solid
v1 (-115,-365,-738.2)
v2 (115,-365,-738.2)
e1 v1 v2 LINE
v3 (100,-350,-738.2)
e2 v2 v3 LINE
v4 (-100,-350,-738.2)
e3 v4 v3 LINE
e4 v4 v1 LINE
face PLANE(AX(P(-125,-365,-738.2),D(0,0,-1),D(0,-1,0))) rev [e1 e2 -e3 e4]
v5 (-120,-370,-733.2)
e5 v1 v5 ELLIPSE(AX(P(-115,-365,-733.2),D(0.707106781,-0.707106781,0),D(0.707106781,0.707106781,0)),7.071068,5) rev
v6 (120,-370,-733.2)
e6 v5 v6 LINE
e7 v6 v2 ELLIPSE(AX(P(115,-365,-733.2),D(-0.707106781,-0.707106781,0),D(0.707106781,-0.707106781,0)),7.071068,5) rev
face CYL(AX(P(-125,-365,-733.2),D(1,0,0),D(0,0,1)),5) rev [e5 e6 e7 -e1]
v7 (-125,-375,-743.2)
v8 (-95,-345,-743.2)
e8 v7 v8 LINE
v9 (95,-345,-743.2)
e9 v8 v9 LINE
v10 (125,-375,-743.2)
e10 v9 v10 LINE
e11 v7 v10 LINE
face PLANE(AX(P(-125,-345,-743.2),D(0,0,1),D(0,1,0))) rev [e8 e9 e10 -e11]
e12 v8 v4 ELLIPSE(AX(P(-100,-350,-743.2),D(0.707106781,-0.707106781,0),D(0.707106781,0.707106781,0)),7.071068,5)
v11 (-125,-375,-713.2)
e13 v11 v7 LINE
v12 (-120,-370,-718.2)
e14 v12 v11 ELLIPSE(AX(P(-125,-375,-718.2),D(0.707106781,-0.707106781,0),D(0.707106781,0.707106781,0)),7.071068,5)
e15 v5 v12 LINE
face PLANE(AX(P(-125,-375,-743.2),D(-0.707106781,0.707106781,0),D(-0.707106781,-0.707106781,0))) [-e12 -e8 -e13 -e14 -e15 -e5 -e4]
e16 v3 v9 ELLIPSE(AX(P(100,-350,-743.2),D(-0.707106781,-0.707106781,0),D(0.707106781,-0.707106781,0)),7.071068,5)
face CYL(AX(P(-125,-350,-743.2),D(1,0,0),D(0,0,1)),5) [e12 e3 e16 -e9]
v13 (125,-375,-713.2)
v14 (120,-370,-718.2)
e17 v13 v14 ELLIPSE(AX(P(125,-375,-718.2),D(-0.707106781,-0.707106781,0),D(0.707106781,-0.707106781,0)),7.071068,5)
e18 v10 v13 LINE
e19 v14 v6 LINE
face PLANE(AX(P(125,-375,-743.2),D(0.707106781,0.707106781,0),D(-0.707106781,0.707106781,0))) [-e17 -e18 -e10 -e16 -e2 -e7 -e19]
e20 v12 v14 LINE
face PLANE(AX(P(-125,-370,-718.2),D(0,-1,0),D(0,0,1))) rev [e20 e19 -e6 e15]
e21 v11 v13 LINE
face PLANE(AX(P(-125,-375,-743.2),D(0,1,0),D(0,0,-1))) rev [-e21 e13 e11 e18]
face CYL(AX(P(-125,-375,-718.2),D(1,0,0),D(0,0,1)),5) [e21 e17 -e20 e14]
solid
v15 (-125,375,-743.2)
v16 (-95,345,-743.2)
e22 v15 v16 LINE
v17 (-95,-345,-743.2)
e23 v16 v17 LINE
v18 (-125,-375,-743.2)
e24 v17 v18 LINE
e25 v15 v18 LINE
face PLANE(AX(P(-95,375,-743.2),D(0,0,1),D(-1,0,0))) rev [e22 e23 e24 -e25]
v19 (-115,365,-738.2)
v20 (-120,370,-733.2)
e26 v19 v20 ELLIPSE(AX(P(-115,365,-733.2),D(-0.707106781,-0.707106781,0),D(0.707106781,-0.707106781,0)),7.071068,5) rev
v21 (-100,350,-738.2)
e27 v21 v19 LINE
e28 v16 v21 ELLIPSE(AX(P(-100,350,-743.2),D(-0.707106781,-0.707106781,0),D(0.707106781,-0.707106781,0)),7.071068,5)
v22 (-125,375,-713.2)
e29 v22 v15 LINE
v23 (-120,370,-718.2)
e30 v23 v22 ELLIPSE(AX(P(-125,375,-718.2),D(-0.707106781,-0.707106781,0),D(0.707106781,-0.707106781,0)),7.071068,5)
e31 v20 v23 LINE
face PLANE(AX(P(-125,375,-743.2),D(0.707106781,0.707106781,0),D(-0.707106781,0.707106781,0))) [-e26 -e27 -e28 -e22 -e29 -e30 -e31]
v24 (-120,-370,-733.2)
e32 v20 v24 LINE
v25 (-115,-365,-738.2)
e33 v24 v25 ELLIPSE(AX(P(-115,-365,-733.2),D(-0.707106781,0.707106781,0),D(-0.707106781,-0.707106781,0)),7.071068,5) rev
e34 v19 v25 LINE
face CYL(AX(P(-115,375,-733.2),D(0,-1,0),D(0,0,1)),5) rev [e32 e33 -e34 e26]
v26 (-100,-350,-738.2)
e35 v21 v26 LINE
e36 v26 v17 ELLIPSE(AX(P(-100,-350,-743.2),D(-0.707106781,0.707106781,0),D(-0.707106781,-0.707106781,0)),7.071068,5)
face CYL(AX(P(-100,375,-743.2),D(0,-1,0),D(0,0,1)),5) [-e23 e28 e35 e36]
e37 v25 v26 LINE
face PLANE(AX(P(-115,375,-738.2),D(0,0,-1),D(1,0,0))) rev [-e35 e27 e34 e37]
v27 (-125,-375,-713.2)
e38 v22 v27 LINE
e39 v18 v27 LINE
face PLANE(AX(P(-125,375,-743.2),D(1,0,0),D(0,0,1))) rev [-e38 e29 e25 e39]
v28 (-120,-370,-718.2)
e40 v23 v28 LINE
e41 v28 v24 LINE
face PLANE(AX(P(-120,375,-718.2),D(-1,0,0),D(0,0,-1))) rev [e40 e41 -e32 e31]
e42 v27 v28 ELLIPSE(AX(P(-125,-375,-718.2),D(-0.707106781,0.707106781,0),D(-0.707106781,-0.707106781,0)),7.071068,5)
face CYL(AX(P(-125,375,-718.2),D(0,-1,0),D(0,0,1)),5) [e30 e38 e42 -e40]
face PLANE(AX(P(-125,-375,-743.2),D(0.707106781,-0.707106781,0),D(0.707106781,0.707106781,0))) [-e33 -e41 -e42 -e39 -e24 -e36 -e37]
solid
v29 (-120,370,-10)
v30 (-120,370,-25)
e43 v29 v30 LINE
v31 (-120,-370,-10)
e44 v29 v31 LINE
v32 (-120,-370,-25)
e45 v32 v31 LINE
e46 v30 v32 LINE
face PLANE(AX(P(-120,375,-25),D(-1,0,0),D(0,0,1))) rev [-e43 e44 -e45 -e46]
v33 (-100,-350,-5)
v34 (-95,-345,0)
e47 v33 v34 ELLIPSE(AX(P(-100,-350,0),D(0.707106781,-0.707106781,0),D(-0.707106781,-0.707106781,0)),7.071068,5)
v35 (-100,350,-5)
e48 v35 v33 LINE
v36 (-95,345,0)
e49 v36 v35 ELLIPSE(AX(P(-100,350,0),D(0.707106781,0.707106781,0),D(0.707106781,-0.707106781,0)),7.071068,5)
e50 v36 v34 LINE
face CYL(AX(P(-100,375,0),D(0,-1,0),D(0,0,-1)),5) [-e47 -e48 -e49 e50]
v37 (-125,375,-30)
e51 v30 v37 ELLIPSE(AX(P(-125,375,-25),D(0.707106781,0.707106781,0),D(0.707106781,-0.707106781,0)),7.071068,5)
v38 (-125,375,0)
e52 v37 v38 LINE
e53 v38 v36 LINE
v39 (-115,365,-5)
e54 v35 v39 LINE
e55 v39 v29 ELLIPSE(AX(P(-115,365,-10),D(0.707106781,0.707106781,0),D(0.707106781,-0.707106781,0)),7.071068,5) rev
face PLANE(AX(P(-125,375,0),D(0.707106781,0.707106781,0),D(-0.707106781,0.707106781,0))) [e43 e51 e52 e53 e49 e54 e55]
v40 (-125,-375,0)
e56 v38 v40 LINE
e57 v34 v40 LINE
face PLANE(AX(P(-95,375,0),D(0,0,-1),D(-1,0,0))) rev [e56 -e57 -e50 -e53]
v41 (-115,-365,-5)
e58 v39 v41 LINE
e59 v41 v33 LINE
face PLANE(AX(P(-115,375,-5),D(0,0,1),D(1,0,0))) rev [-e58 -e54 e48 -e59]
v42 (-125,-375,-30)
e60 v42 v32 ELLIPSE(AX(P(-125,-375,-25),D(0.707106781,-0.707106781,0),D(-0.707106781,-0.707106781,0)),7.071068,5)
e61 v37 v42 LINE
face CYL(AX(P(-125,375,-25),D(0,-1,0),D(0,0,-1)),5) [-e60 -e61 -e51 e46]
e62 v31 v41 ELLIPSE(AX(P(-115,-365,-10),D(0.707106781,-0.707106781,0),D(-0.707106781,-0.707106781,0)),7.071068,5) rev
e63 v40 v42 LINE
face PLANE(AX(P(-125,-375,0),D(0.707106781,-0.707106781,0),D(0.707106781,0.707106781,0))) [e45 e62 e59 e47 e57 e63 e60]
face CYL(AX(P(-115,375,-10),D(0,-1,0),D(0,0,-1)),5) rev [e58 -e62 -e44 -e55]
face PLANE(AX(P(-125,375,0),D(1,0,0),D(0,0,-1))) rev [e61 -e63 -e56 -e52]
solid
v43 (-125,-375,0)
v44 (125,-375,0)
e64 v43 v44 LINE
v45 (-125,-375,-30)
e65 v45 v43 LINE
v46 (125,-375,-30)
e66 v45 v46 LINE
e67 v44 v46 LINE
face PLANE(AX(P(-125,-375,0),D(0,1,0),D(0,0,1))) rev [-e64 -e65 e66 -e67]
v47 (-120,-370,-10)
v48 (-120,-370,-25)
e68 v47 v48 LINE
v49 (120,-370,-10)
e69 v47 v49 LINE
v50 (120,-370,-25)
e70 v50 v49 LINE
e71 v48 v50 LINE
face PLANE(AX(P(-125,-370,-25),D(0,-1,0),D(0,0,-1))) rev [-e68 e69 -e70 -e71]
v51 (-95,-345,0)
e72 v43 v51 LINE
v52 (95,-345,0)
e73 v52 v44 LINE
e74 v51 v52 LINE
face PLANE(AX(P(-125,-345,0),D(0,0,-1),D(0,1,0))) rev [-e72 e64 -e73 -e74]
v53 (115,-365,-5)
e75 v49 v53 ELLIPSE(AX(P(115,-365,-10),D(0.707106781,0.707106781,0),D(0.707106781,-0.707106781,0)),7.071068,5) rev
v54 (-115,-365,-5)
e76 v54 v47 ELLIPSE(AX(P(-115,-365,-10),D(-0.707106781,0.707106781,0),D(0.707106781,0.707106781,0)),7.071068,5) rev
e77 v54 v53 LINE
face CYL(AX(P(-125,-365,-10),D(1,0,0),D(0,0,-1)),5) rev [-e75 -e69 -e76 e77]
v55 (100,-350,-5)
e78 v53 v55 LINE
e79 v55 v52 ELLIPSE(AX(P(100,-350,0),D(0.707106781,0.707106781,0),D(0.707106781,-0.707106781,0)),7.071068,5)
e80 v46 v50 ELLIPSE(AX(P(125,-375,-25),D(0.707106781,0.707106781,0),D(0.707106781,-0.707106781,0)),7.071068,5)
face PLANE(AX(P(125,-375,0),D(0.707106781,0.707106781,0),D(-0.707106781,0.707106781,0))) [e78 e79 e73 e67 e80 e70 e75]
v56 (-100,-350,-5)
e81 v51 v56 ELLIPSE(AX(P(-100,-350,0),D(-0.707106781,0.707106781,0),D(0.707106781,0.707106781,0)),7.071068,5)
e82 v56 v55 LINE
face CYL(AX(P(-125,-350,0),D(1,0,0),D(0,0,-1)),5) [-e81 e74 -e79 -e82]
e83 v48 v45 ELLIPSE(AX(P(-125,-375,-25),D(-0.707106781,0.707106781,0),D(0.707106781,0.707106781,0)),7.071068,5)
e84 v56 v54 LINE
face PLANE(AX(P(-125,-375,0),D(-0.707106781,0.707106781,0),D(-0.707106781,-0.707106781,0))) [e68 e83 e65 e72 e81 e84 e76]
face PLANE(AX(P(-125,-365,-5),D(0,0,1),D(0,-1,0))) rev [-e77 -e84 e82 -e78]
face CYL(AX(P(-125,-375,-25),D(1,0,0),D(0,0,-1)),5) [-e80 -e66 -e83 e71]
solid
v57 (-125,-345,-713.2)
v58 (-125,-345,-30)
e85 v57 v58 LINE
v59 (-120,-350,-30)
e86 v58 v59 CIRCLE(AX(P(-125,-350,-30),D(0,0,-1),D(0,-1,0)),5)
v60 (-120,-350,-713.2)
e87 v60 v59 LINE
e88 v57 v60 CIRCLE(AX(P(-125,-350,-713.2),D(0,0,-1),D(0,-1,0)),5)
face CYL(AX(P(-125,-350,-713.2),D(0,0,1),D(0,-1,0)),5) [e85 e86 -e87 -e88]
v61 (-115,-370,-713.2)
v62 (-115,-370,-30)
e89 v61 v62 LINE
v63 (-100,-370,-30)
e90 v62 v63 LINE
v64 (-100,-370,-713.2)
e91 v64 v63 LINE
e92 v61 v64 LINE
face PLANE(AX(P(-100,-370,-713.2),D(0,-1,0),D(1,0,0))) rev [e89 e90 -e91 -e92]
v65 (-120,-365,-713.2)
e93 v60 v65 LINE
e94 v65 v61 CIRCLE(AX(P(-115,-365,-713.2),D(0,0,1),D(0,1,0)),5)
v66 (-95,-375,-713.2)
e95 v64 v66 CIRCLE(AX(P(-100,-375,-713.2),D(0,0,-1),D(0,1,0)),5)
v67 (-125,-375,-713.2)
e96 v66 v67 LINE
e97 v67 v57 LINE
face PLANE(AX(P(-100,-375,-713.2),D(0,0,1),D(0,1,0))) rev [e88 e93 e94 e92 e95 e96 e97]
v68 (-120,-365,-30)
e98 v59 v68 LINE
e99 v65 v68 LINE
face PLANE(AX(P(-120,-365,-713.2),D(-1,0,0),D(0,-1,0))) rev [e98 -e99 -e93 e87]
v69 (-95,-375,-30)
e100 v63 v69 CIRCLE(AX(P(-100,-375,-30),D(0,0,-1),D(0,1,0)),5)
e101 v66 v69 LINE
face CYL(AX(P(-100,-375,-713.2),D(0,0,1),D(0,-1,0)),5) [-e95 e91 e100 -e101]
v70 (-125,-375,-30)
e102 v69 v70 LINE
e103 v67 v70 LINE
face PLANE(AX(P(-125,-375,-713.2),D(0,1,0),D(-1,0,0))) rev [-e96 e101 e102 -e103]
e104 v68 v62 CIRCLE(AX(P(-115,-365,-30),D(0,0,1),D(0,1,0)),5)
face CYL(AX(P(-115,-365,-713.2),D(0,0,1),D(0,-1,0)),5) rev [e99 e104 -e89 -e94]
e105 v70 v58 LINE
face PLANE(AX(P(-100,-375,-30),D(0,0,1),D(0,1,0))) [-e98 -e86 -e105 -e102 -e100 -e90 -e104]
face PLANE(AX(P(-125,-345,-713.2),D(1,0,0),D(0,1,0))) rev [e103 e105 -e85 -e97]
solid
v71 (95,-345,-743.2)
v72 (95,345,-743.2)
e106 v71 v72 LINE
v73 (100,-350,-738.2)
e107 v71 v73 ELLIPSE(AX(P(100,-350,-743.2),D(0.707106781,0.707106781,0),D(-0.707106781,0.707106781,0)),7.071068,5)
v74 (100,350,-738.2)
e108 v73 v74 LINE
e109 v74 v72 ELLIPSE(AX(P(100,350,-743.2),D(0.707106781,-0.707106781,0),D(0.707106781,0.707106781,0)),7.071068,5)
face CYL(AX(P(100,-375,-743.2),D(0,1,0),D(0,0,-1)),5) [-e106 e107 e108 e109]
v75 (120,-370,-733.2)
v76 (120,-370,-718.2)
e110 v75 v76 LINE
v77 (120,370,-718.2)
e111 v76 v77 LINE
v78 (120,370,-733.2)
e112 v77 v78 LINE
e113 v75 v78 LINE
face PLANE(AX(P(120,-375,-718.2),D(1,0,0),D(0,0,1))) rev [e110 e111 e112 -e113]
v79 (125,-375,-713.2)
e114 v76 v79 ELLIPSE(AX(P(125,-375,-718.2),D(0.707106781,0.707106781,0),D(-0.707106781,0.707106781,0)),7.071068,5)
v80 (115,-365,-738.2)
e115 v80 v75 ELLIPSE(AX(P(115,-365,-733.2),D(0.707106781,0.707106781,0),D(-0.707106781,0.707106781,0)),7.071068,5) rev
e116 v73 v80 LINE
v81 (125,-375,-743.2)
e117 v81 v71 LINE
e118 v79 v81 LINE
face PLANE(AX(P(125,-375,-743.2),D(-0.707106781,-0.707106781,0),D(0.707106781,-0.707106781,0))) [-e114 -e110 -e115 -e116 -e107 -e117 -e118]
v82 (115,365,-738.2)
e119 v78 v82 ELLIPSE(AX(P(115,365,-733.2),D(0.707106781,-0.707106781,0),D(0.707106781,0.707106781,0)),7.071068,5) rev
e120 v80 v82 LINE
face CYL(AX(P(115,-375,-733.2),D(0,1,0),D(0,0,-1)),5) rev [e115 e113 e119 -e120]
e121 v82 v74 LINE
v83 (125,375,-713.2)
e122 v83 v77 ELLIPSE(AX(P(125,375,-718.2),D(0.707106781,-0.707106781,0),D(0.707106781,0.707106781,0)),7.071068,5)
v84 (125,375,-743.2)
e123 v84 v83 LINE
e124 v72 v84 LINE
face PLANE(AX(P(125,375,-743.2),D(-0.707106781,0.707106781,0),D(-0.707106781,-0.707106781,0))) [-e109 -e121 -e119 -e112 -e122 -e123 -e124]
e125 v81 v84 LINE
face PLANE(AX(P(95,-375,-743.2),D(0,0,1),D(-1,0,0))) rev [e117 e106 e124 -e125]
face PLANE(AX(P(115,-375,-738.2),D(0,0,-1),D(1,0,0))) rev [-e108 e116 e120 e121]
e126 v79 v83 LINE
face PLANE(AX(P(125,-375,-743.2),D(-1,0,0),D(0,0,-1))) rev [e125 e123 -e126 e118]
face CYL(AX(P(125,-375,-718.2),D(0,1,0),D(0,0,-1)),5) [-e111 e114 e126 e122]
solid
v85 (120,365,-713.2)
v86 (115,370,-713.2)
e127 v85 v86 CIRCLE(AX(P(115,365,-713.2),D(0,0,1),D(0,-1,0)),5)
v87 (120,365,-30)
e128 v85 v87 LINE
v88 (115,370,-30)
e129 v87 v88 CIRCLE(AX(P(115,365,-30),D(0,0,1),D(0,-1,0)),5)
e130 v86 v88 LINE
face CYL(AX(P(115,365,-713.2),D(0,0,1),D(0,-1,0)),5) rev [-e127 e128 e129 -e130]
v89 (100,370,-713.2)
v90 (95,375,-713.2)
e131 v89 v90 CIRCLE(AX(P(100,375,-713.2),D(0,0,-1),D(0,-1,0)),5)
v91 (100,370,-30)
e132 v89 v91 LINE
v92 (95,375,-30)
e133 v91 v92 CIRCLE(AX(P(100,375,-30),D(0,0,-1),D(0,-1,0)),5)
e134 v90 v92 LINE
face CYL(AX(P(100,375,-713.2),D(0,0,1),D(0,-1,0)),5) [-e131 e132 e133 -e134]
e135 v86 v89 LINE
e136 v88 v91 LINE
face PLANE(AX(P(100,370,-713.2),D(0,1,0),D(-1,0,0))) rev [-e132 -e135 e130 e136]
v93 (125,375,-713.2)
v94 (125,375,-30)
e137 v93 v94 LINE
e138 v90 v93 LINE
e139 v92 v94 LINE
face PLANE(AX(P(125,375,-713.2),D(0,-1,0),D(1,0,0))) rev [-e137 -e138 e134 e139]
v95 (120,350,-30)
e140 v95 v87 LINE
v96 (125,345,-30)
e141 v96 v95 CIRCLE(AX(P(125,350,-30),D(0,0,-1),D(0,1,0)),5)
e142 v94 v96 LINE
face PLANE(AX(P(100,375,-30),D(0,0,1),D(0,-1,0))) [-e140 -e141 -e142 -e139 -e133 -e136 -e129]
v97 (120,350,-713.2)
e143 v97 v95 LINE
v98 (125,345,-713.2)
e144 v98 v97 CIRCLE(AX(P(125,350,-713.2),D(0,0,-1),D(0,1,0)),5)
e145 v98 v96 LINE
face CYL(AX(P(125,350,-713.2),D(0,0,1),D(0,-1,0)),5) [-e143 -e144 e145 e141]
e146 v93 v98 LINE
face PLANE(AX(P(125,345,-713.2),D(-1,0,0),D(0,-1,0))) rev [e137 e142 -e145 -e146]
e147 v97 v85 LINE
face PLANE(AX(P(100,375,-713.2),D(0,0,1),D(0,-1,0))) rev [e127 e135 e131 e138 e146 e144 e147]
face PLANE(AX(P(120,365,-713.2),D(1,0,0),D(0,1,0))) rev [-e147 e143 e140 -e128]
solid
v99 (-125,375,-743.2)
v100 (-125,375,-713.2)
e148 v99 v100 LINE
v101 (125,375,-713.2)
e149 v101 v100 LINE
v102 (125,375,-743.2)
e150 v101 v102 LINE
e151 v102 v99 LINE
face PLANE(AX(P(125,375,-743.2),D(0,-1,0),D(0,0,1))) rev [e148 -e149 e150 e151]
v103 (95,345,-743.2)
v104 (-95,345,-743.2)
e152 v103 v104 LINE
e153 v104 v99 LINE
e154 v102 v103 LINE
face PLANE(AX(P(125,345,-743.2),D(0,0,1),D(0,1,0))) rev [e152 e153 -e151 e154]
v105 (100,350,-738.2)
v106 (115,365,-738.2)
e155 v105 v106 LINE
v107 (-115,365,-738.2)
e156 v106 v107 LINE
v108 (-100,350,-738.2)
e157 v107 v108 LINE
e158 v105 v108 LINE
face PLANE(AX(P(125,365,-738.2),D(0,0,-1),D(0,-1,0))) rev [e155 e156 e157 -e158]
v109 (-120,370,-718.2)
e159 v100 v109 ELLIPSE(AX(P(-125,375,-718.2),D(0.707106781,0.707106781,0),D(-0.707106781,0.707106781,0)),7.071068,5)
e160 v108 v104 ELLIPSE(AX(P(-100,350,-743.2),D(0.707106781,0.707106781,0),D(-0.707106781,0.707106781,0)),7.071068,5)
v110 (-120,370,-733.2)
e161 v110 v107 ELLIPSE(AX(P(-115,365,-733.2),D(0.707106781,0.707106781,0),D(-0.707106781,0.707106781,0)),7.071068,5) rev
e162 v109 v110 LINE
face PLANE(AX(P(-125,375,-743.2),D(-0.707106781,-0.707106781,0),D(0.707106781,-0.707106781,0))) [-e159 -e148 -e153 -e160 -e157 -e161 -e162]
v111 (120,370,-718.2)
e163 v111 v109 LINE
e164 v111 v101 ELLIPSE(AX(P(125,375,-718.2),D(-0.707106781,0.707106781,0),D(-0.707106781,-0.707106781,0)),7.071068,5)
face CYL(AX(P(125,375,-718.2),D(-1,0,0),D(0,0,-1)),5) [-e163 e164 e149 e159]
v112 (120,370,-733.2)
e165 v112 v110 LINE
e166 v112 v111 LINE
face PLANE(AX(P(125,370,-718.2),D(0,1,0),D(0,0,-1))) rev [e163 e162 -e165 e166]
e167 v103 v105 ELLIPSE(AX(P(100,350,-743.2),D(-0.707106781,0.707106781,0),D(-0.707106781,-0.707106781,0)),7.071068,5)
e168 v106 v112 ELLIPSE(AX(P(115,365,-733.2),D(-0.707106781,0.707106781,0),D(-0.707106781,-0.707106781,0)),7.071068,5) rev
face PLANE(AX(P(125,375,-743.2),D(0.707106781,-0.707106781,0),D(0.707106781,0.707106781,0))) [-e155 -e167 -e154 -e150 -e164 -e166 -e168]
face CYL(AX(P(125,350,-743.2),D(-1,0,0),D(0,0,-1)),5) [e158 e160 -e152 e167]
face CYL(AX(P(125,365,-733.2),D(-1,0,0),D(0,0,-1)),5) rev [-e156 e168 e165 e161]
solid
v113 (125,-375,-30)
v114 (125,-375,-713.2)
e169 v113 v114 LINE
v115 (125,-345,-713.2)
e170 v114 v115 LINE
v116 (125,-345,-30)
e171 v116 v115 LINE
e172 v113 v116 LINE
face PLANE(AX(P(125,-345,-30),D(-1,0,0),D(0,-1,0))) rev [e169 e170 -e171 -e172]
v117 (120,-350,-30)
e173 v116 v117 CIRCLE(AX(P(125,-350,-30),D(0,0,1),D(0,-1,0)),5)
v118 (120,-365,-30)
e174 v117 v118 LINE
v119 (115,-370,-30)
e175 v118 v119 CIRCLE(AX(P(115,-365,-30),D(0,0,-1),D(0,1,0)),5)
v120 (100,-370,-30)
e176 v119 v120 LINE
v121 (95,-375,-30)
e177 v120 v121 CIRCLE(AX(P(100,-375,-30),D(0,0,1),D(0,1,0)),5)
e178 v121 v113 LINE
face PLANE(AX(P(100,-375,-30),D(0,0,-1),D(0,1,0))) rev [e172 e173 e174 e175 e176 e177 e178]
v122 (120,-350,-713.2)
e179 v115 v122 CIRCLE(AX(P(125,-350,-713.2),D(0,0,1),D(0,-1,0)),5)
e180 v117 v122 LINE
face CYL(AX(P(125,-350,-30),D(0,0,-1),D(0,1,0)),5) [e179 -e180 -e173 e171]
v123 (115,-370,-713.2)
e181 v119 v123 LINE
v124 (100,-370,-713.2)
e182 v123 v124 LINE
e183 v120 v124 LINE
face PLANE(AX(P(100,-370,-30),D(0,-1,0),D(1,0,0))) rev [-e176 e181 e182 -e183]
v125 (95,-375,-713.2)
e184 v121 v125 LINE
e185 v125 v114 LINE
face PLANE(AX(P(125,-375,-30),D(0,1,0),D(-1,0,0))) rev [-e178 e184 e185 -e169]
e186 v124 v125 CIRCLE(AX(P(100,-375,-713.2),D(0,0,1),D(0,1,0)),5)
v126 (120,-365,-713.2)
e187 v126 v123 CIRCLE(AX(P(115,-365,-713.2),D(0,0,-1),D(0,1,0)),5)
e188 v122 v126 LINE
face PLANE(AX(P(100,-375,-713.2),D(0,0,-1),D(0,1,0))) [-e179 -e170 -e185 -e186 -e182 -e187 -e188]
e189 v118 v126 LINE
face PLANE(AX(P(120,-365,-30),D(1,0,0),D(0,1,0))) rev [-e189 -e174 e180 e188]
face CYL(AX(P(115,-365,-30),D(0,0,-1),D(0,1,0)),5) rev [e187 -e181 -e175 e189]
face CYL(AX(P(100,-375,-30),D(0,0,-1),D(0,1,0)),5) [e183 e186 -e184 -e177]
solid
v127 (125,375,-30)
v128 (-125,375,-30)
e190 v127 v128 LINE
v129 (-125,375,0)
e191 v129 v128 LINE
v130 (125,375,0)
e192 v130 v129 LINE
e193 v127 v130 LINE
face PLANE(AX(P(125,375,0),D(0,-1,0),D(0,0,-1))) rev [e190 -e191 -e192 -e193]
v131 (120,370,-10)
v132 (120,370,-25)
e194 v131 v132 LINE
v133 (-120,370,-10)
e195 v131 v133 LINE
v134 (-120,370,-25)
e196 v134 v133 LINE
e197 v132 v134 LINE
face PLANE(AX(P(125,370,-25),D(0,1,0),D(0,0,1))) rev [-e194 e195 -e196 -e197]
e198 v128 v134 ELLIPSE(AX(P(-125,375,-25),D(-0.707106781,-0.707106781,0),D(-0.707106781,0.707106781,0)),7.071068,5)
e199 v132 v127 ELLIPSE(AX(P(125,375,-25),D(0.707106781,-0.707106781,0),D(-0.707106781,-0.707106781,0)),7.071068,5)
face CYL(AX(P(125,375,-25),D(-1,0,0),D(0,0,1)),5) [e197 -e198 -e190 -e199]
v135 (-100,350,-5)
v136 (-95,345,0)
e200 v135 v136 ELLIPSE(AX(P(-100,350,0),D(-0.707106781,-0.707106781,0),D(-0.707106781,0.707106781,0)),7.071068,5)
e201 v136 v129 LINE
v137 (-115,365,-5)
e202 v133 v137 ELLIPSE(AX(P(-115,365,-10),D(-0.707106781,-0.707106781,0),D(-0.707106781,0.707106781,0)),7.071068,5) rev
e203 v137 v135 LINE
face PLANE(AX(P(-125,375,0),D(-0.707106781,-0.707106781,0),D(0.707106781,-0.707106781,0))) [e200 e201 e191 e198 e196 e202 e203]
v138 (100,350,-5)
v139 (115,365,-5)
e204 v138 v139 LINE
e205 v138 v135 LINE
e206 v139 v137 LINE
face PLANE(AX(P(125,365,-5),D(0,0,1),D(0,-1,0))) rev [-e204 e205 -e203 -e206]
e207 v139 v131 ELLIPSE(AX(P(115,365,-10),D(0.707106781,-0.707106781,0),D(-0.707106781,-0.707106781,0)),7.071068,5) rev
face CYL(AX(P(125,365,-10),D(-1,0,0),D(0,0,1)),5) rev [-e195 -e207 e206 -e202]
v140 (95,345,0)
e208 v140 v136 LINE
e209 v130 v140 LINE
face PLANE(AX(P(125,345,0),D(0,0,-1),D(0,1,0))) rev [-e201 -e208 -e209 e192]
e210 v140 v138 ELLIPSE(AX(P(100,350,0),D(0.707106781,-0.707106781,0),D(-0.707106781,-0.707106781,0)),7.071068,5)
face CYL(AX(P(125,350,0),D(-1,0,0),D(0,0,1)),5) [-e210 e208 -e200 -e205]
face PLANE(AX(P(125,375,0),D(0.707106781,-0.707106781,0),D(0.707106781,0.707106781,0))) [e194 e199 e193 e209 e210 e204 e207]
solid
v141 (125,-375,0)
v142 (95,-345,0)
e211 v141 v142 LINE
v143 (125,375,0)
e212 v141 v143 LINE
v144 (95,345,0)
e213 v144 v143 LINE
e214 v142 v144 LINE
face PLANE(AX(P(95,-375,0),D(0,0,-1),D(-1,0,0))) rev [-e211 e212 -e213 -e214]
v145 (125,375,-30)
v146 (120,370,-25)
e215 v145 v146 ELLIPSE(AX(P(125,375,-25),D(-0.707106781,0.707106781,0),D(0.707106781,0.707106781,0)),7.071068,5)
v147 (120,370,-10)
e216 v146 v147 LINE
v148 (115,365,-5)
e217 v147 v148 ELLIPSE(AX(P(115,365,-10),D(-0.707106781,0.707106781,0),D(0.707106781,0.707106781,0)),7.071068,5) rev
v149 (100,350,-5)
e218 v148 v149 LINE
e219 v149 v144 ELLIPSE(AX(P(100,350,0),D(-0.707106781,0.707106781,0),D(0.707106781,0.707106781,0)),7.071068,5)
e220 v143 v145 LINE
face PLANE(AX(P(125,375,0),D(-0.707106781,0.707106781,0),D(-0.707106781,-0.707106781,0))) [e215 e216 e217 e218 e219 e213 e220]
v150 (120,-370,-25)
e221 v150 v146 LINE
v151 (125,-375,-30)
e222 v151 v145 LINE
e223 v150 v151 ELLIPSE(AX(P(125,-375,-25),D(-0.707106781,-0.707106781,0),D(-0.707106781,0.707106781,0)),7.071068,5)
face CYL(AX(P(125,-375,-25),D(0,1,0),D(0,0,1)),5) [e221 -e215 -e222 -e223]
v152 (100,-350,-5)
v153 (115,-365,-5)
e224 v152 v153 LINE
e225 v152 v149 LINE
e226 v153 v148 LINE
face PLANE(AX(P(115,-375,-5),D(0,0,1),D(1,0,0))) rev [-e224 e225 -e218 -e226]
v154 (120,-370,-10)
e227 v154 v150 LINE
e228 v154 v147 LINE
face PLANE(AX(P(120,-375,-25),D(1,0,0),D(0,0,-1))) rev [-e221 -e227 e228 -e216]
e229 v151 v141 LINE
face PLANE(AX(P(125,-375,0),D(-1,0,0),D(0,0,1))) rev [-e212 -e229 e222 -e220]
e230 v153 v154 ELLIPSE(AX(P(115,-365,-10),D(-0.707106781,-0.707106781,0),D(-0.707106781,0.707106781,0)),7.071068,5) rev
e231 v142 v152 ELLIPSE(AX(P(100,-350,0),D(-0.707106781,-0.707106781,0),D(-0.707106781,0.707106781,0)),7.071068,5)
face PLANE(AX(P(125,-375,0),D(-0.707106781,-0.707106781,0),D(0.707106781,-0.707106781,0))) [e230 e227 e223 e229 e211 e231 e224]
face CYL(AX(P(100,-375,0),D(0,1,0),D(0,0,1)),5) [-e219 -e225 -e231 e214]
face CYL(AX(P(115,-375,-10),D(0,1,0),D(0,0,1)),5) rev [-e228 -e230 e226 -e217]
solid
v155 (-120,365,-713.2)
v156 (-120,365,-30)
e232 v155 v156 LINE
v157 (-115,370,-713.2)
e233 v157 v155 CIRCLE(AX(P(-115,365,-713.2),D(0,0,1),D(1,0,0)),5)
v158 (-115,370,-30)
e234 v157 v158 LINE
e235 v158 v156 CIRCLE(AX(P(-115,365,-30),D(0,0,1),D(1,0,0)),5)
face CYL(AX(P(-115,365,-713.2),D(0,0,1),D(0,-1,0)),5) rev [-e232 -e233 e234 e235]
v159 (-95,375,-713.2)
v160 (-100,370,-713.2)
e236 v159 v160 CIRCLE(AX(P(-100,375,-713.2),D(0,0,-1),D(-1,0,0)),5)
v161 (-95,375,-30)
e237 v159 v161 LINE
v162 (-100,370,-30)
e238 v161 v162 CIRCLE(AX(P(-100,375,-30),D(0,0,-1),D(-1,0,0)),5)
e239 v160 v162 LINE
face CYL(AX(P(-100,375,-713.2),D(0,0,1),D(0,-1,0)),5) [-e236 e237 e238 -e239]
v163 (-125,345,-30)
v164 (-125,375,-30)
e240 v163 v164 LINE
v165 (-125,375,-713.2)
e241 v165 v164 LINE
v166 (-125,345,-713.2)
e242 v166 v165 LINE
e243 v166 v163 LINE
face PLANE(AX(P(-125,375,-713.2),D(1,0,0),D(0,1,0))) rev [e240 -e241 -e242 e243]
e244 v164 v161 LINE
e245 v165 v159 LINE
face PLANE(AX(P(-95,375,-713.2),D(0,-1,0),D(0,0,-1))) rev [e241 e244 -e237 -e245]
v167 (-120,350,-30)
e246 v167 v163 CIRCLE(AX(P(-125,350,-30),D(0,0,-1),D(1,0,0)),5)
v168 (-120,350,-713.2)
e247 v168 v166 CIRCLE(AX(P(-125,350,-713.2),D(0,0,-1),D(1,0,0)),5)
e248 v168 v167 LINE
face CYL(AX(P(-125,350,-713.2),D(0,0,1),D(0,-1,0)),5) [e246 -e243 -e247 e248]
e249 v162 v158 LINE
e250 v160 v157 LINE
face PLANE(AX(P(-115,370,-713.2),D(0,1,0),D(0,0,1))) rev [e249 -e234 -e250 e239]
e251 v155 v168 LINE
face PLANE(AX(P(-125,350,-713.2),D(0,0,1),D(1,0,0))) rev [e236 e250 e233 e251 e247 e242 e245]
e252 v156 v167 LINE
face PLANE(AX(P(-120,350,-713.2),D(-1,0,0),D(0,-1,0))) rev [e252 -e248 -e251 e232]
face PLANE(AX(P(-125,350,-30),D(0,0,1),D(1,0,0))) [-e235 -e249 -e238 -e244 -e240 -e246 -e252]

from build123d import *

# Parameters (mm, degrees)
ANGLE_IRON_CONFIGURED_35_X_35_X_5_1_DEPTH      = 293.426406871
ANGLE_IRON_CONFIGURED_35_X_35_X_5_1_DEPTH_BACK = 43.426406871
ANGLE_IRON_CONFIGURED_35_X_35_X_5_1_2_DEPTH    = 836.852813742
ANGLE_IRON_CONFIGURED_35_X_35_X_5_1_3_DEPTH    = 336.852813742
ANGLE_IRON_CONFIGURED_35_X_35_X_5_1_4_DEPTH    = 836.852813742
ANGLE_START                                    = -713.2
ANGLE_IRON_CONFIGURED_35_X_35_X_5_9_DEPTH      = 683.2


# Read off the part's stored shape, not the designer's step: Angle iron - configured 35 X 35 X 5(2)
with BuildPart() as part:
    # Sketch11 → Angle iron - configured 35 X 35 X 5(1) (new, two sides: drawn at the far end of the back side and taken through both)
    with BuildSketch(Plane(origin=(-125, 375, 0), x_dir=(0, -1, 0), z_dir=(1, 0, 0)).offset(-ANGLE_IRON_CONFIGURED_35_X_35_X_5_1_DEPTH_BACK)):
        with BuildLine():
            Line((0, 0), (0, 30))
            ThreePointArc((0, 30), (3.535533906, 28.535533906), (5, 25))
            Line((5, 25), (5, 10))
            ThreePointArc((5, 10), (6.464466094, 6.464466094), (10, 5))
            Line((10, 5), (25, 5))
            ThreePointArc((25, 5), (28.535533906, 3.535533906), (30, 0))
            Line((30, 0), (0, 0))
        make_face()
    extrude(amount=ANGLE_IRON_CONFIGURED_35_X_35_X_5_1_DEPTH + ANGLE_IRON_CONFIGURED_35_X_35_X_5_1_DEPTH_BACK)

    # Angle iron - configured 35 X 35 X 5(1) mi
    split(bisect_by=Plane(origin=(-125, 375, 0), x_dir=(-0.707106781, 0.707106781, 0), z_dir=(0.707106781, 0.707106781, 0)), keep=Keep.TOP)

    # Angle iron - configured 35 X 35 X 5_ 2
    split(bisect_by=Plane(origin=(125, 375, 0), x_dir=(-0.707106781, -0.707106781, 0), z_dir=(-0.707106781, 0.707106781, 0)), keep=Keep.TOP)


with BuildPart() as body_2:
    # Sketch11 on segment 2 (carried to segment 2) → Angle iron - configured 35 X 35 X 5_1 2 (new body)
    with BuildSketch(Plane(origin=(125, 418.426406871, 0), x_dir=(-1, 0, 0), z_dir=(0, -1, 0))):
        with BuildLine():
            Line((0, 0), (0, 30))
            ThreePointArc((0, 30), (3.535533906, 28.535533906), (5, 25))
            Line((5, 25), (5, 10))
            ThreePointArc((5, 10), (6.464466094, 6.464466094), (10, 5))
            Line((10, 5), (25, 5))
            ThreePointArc((25, 5), (28.535533906, 3.535533906), (30, 0))
            Line((30, 0), (0, 0))
        make_face()
    extrude(amount=ANGLE_IRON_CONFIGURED_35_X_35_X_5_1_2_DEPTH)

    # Angle iron - configured 35 X 35 X 5_ 3
    split(bisect_by=Plane(origin=(125, -375, 0), x_dir=(-0.707106781, 0.707106781, 0), z_dir=(0.707106781, 0.707106781, 0)), keep=Keep.TOP)

    # Angle iron - configured 35 X 35 X 5_ 4
    split(bisect_by=Plane(origin=(125, 375, 0), x_dir=(0.707106781, 0.707106781, 0), z_dir=(0.707106781, -0.707106781, 0)), keep=Keep.TOP)


with BuildPart() as body_3:
    # Sketch11 on segment 3 (carried to segment 3) → Angle iron - configured 35 X 35 X 5_1 3 (new body)
    with BuildSketch(Plane(origin=(168.426406871, -375, 0), x_dir=(0, 1, 0), z_dir=(-1, 0, 0))):
        with BuildLine():
            Line((0, 0), (0, 30))
            ThreePointArc((0, 30), (3.535533906, 28.535533906), (5, 25))
            Line((5, 25), (5, 10))
            ThreePointArc((5, 10), (6.464466094, 6.464466094), (10, 5))
            Line((10, 5), (25, 5))
            ThreePointArc((25, 5), (28.535533906, 3.535533906), (30, 0))
            Line((30, 0), (0, 0))
        make_face()
    extrude(amount=ANGLE_IRON_CONFIGURED_35_X_35_X_5_1_3_DEPTH)

    # Angle iron - configured 35 X 35 X 5_ 5
    split(bisect_by=Plane(origin=(-125, -375, 0), x_dir=(0.707106781, 0.707106781, 0), z_dir=(0.707106781, -0.707106781, 0)), keep=Keep.TOP)

    # Angle iron - configured 35 X 35 X 5_ 6
    split(bisect_by=Plane(origin=(125, -375, 0), x_dir=(0.707106781, -0.707106781, 0), z_dir=(-0.707106781, -0.707106781, 0)), keep=Keep.TOP)


with BuildPart() as body_4:
    # Sketch11 on segment 4 (carried to segment 4) → Angle iron - configured 35 X 35 X 5_1 4 (new body)
    with BuildSketch(Plane(origin=(-125, -418.426406871, 0), x_dir=(1, 0, 0), z_dir=(0, 1, 0))):
        with BuildLine():
            Line((0, 0), (0, 30))
            ThreePointArc((0, 30), (3.535533906, 28.535533906), (5, 25))
            Line((5, 25), (5, 10))
            ThreePointArc((5, 10), (6.464466094, 6.464466094), (10, 5))
            Line((10, 5), (25, 5))
            ThreePointArc((25, 5), (28.535533906, 3.535533906), (30, 0))
            Line((30, 0), (0, 0))
        make_face()
    extrude(amount=ANGLE_IRON_CONFIGURED_35_X_35_X_5_1_4_DEPTH)

    # Angle iron - configured 35 X 35 X 5_ 7
    split(bisect_by=Plane(origin=(-125, -375, 0), x_dir=(-0.707106781, -0.707106781, 0), z_dir=(-0.707106781, 0.707106781, 0)), keep=Keep.TOP)

    # Angle iron - configured 35 X 35 X 5_ 8
    split(bisect_by=Plane(origin=(-125, 375, 0), x_dir=(0.707106781, -0.707106781, 0), z_dir=(-0.707106781, -0.707106781, 0)), keep=Keep.TOP)


with BuildPart() as body_5:
    # Mirror1: mirrored copy
    add(body_4.part.mirror(Plane.XY.offset(-371.6)))


with BuildPart() as body_6:
    # Mirror1 2: mirrored copy
    add(part.part.mirror(Plane.XY.offset(-371.6)))


with BuildPart() as body_7:
    # Mirror1 3: mirrored copy
    add(body_2.part.mirror(Plane.XY.offset(-371.6)))


with BuildPart() as body_8:
    # Mirror1 4: mirrored copy
    add(body_3.part.mirror(Plane.XY.offset(-371.6)))


with BuildPart() as body_9:
    # Angle iron - configured 35 X 35 X 5_ 9 o → Angle iron - configured 35 X 35 X 5_ 9 (new body)
    with BuildSketch(Plane.XY.offset(ANGLE_START)):
        with BuildLine():
            Line((-125, -345), (-125, -375))
            Line((-125, -375), (-95, -375))
            ThreePointArc((-95, -375), (-96.464466094, -371.464466094), (-100, -370))
            Line((-100, -370), (-115, -370))
            ThreePointArc((-115, -370), (-118.535533906, -368.535533906), (-120, -365))
            Line((-120, -365), (-120, -350))
            ThreePointArc((-120, -350), (-121.464466094, -346.464466094), (-125, -345))
        make_face()
        with BuildLine():
            Line((-125, 375), (-125, 345))
            ThreePointArc((-125, 345), (-121.464466094, 346.464466094), (-120, 350))
            Line((-120, 350), (-120, 365))
            ThreePointArc((-120, 365), (-118.535533906, 368.535533906), (-115, 370))
            Line((-115, 370), (-100, 370))
            ThreePointArc((-100, 370), (-96.464466094, 371.464466094), (-95, 375))
            Line((-95, 375), (-125, 375))
        make_face()
        with BuildLine():
            Line((115, -370), (100, -370))
            ThreePointArc((100, -370), (96.464466094, -371.464466094), (95, -375))
            Line((95, -375), (125, -375))
            Line((125, -375), (125, -345))
            ThreePointArc((125, -345), (121.464466094, -346.464466094), (120, -350))
            Line((120, -350), (120, -365))
            ThreePointArc((120, -365), (118.535533906, -368.535533906), (115, -370))
        make_face()
        with BuildLine():
            Line((125, 345), (125, 375))
            Line((125, 375), (95, 375))
            ThreePointArc((95, 375), (96.464466094, 371.464466094), (100, 370))
            Line((100, 370), (115, 370))
            ThreePointArc((115, 370), (118.535533906, 368.535533906), (120, 365))
            Line((120, 365), (120, 350))
            ThreePointArc((120, 350), (121.464466094, 346.464466094), (125, 345))
        make_face()
    extrude(amount=ANGLE_IRON_CONFIGURED_35_X_35_X_5_9_DEPTH)


solid = Compound([part.part, body_2.part, body_3.part, body_4.part, body_5.part, body_6.part, body_7.part, body_8.part, body_9.part])
